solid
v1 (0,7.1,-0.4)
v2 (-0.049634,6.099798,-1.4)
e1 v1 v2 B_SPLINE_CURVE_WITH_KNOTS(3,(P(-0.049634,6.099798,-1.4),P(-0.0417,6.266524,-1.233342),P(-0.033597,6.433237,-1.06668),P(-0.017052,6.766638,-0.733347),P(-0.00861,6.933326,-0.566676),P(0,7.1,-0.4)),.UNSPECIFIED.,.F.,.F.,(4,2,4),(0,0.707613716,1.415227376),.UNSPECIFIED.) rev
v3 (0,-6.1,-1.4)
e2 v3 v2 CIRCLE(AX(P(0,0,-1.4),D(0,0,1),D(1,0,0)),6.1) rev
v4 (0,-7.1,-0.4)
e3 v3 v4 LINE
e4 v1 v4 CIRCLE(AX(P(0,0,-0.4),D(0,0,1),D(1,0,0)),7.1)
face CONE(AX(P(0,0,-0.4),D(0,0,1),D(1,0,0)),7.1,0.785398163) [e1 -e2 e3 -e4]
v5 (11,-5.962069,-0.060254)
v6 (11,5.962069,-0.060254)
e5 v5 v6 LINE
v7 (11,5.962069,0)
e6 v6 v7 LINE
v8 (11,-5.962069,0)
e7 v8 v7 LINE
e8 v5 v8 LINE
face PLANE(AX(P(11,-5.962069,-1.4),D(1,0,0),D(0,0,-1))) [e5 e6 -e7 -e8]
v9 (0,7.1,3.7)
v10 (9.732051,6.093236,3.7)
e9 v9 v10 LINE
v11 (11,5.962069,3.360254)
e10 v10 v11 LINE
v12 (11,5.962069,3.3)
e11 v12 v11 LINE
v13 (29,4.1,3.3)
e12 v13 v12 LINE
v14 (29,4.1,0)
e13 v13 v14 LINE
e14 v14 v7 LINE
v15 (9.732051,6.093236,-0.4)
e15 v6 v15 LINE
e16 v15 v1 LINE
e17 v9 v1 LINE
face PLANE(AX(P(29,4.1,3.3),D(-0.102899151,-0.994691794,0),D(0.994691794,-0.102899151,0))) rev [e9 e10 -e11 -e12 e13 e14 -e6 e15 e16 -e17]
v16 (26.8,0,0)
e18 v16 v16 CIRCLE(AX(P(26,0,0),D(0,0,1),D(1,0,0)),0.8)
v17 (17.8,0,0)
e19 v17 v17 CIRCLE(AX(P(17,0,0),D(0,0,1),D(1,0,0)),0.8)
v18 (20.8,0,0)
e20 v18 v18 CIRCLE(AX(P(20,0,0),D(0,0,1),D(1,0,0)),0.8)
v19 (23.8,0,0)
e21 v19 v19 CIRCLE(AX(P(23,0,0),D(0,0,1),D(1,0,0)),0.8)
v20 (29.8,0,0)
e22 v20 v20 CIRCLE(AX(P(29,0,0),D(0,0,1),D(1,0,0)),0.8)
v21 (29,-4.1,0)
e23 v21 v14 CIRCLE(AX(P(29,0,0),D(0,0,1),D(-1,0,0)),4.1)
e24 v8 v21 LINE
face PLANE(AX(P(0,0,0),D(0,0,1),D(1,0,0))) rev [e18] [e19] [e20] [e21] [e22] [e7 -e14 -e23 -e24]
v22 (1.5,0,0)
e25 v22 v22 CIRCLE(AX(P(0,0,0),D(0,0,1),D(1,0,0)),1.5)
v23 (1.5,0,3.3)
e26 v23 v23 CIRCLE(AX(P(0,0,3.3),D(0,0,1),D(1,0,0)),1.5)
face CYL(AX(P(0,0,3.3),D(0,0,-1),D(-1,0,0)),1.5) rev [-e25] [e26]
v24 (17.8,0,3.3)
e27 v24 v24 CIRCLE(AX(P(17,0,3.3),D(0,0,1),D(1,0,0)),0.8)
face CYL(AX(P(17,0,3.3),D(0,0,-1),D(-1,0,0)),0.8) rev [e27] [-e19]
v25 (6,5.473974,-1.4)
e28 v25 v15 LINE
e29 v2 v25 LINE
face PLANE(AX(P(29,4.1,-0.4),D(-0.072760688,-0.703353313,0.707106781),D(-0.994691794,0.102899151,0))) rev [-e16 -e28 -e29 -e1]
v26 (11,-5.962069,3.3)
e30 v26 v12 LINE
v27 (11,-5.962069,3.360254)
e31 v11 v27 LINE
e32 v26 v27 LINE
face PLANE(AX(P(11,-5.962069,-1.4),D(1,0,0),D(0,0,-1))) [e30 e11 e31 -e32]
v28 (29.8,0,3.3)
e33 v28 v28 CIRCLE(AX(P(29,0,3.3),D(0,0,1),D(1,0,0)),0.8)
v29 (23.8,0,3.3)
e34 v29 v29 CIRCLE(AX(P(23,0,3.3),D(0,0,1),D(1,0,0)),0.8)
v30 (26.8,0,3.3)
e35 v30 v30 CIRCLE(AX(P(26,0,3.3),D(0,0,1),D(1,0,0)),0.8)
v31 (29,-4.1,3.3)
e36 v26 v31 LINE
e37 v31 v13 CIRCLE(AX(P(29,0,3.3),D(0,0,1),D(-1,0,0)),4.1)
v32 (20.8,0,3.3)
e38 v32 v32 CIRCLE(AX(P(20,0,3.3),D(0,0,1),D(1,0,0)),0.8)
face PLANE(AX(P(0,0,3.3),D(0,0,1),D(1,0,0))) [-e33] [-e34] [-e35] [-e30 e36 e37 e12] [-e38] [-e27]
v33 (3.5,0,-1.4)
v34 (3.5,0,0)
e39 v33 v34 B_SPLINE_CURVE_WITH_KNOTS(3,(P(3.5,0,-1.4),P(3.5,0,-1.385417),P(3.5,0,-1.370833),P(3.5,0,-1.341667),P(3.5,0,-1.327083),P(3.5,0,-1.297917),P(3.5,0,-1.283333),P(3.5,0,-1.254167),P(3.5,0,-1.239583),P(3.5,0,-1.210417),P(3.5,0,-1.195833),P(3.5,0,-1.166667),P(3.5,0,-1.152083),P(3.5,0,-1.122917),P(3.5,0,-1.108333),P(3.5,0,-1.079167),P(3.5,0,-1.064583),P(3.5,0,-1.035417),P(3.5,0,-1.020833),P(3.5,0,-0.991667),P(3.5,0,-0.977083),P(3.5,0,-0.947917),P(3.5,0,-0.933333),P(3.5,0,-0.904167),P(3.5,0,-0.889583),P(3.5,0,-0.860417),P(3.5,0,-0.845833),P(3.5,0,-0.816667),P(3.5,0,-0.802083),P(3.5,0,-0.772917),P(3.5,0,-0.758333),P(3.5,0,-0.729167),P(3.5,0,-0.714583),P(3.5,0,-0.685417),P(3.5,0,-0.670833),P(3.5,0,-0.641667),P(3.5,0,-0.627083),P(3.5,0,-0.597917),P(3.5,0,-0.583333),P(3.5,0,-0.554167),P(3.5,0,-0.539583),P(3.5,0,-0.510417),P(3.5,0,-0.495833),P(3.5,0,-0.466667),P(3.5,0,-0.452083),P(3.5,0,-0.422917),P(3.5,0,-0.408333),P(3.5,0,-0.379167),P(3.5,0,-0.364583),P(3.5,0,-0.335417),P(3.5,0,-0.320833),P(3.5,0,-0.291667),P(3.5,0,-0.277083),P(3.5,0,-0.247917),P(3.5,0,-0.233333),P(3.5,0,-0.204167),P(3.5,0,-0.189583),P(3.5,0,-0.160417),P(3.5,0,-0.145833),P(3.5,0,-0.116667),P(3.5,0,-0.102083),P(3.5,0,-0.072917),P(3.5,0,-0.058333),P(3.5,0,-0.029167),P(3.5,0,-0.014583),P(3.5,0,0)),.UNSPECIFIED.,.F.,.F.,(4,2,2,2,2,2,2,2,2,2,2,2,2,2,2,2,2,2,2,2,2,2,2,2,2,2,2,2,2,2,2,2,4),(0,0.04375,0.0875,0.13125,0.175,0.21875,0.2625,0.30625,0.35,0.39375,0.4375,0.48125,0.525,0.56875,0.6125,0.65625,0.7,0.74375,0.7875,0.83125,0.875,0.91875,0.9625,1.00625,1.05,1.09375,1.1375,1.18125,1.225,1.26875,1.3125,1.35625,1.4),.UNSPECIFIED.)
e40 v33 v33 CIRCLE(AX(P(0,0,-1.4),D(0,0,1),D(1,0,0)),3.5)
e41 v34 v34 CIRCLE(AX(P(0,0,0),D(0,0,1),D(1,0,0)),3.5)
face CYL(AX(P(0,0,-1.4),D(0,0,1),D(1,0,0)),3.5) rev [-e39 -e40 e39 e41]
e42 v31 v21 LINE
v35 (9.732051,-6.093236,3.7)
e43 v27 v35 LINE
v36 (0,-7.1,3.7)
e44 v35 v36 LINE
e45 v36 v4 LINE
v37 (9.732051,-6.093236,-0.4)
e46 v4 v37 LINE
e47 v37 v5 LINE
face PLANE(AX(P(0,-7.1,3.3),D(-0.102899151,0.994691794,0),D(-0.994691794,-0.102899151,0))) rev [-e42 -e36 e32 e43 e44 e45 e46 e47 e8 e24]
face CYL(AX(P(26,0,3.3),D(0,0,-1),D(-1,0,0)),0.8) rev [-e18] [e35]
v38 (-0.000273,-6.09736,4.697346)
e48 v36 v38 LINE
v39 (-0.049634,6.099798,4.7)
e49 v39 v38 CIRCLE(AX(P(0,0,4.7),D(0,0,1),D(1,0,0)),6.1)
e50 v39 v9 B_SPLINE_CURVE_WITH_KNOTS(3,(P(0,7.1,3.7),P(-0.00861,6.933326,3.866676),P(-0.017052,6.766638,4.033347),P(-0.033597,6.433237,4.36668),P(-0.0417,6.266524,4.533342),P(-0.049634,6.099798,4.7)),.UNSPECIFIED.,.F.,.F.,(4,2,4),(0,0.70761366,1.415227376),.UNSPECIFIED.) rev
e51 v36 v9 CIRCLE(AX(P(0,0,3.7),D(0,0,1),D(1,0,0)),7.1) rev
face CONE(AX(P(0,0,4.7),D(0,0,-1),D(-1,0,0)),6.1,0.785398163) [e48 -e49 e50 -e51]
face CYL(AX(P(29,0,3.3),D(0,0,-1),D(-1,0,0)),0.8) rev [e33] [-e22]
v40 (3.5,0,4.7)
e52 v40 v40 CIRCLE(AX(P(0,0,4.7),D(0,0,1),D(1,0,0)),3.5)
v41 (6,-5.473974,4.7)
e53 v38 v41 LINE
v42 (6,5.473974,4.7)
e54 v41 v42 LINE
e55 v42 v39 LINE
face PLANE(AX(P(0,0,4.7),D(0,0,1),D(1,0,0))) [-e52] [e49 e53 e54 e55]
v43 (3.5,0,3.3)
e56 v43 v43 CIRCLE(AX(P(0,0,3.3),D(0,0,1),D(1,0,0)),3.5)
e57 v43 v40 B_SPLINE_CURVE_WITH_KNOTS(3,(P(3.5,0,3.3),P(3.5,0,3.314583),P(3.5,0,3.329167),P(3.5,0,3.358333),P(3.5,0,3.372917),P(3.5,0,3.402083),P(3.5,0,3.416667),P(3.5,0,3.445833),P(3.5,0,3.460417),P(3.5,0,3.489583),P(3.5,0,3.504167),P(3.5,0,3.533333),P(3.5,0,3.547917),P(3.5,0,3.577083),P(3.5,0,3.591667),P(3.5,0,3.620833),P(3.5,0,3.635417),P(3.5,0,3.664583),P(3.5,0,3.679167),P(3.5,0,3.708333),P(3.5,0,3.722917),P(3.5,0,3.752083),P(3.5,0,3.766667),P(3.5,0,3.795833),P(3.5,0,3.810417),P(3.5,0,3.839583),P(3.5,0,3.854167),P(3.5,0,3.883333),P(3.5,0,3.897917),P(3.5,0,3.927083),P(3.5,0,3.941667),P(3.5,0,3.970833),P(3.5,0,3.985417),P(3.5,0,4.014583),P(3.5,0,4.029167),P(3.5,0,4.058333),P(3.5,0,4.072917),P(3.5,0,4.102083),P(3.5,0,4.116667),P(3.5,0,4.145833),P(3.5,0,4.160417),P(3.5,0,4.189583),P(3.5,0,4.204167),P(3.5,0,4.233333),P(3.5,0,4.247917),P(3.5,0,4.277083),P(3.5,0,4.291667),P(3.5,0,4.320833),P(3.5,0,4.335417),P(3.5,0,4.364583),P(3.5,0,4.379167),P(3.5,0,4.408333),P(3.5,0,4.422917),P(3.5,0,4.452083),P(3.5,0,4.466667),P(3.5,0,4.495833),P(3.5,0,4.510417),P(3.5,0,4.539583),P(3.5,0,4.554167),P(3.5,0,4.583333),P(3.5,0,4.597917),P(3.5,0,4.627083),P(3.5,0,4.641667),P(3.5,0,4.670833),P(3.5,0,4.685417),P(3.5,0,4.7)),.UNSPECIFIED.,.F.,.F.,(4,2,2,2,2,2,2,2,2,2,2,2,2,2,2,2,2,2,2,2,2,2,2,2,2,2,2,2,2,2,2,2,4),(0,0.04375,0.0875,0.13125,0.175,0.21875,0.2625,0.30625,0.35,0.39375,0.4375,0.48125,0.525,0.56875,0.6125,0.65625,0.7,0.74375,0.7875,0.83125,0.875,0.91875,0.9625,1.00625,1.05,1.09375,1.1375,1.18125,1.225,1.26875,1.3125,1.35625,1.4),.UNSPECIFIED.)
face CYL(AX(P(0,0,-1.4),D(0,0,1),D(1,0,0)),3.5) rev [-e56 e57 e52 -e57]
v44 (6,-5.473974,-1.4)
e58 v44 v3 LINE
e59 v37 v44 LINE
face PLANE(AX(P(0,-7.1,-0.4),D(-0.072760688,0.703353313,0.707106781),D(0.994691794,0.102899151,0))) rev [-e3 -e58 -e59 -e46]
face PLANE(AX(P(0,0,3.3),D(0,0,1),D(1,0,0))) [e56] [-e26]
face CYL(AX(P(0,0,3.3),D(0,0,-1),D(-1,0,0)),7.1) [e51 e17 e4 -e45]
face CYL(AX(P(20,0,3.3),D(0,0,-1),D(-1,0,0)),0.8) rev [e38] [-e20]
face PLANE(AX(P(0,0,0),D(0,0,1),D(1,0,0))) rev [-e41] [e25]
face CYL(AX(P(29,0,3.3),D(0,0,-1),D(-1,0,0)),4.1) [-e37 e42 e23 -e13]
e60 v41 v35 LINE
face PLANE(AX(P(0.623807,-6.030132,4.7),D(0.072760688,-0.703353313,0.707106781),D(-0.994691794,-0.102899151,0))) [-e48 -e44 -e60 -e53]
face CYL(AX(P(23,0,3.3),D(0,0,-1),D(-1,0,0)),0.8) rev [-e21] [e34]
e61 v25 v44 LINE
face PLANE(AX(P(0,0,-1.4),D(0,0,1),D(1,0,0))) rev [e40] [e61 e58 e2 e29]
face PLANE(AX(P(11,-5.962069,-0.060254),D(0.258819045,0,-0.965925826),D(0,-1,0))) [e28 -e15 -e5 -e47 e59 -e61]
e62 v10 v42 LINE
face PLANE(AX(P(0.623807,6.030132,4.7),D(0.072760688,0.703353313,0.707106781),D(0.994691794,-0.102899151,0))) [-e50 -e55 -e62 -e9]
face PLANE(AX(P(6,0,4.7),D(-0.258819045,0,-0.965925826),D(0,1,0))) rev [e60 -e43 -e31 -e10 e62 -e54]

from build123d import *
from OCP.BRepFilletAPI import BRepFilletAPI_MakeChamfer

# Parameters (mm, degrees)
ESQUISSE1_R             = 0.8
ESQUISSE1_R_2           = 1.5
BOSS_EXTRU_1_DEPTH      = 3.3
BOSS_EXTRU_2_DEPTH      = 1.4
BOSS_EXTRU_2_DEPTH_BACK = 4.7
ESQUISSE2_R             = 3.5
CHANFREIN1_SIZE         = 5
CHANFREIN1_SIZE2        = 1.339745962
CHANFREIN3_SIZE         = 1


with BuildPart() as part:
    # Esquisse1 → Boss.-Extru.1 (new body)
    with BuildSketch(Plane.XY):
        with BuildLine():
            Line((0, -7.1), (29, -4.1))
            ThreePointArc((29, -4.1), (33.1, 0), (29, 4.1))
            Line((29, 4.1), (0, 7.1))
            ThreePointArc((0, 7.1), (-7.1, 0), (0, -7.1))
        make_face()
        with Locations((29, 0)):
            Circle(ESQUISSE1_R, mode=Mode.SUBTRACT)
        with Locations((26, 0)):
            Circle(ESQUISSE1_R, mode=Mode.SUBTRACT)
        with Locations((23, 0)):
            Circle(ESQUISSE1_R, mode=Mode.SUBTRACT)
        with Locations((20, 0)):
            Circle(ESQUISSE1_R, mode=Mode.SUBTRACT)
        with Locations((17, 0)):
            Circle(ESQUISSE1_R, mode=Mode.SUBTRACT)
        Circle(ESQUISSE1_R_2, mode=Mode.SUBTRACT)
    extrude(amount=BOSS_EXTRU_1_DEPTH)

    # Esquisse2 → Boss.-Extru.2 (add, two sides: drawn at the far end of the back side and taken through both)
    with BuildSketch(Plane.XY.offset(3.3).offset(-BOSS_EXTRU_2_DEPTH_BACK)):
        with BuildLine():
            Line((0, -7.1), (11, -5.962068966))
            Line((11, -5.962068966), (11, 5.962068966))
            Line((11, 5.962068966), (0, 7.1))
            ThreePointArc((0, 7.1), (-7.1, 0), (0, -7.1))
        make_face()
        Circle(ESQUISSE2_R, mode=Mode.SUBTRACT)
    extrude(amount=BOSS_EXTRU_2_DEPTH + BOSS_EXTRU_2_DEPTH_BACK)

    # Chanfrein1: one chamfer whose edges measure the first distance from different faces: ONE call of the kernel's chamfer builder (chamfer() names one face for all edges)
    chanfrein1_edges_1 = [part.edges().sort_by_distance(p)[0] for p in [
        (11, 0, -1.4),
    ]]
    chanfrein1_side_1 = [part.faces().sort_by_distance(p)[0] for p in [
        (5.476327604, -6.302201317, -1.4),
    ]]
    chanfrein1_edges_2 = [part.edges().sort_by_distance(p)[0] for p in [
        (11, 0, 4.7),
    ]]
    chanfrein1_side_2 = [part.faces().sort_by_distance(p)[0] for p in [
        (5.476327604, -6.302201317, 4.7),
    ]]
    chanfrein1 = BRepFilletAPI_MakeChamfer(part.part.solid().wrapped)
    for e in chanfrein1_edges_1:
        chanfrein1.Add(CHANFREIN1_SIZE, CHANFREIN1_SIZE2, e.wrapped, chanfrein1_side_1[0].wrapped)  # the first distance lies on this face
    for e in chanfrein1_edges_2:
        chanfrein1.Add(CHANFREIN1_SIZE, CHANFREIN1_SIZE2, e.wrapped, chanfrein1_side_2[0].wrapped)  # the first distance lies on this face
    add(Compound.cast(chanfrein1.Shape()), mode=Mode.REPLACE)

    # Chanfrein3
    chanfrein3_edges = [part.edges().sort_by_distance(p)[0] for p in [
        (3, -6.789655172, 4.7),
    ]]
    chamfer(chanfrein3_edges, length=CHANFREIN3_SIZE)
    chanfrein3_2_edges = [part.edges().sort_by_distance(p)[0] for p in [
        (3, -6.789655172, -1.4),
    ]]
    chamfer(chanfrein3_2_edges, length=CHANFREIN3_SIZE)
    chanfrein3_3_edges = [part.edges().sort_by_distance(p)[0] for p in [
        (3, 6.789655172, 4.7),
    ]]
    chamfer(chanfrein3_3_edges, length=CHANFREIN3_SIZE)
    chanfrein3_4_edges = [part.edges().sort_by_distance(p)[0] for p in [
        (3, 6.789655172, -1.4),
    ]]
    chamfer(chanfrein3_4_edges, length=CHANFREIN3_SIZE)
    chanfrein3_5_edges = [part.edges().sort_by_distance(p)[0] for p in [
        (-7.1, 0, 4.7),
    ]]
    chamfer(chanfrein3_5_edges, length=CHANFREIN3_SIZE)
    chanfrein3_6_edges = [part.edges().sort_by_distance(p)[0] for p in [
        (-7.1, 0, -1.4),
    ]]
    chamfer(chanfrein3_6_edges, length=CHANFREIN3_SIZE)


solid = part.part
